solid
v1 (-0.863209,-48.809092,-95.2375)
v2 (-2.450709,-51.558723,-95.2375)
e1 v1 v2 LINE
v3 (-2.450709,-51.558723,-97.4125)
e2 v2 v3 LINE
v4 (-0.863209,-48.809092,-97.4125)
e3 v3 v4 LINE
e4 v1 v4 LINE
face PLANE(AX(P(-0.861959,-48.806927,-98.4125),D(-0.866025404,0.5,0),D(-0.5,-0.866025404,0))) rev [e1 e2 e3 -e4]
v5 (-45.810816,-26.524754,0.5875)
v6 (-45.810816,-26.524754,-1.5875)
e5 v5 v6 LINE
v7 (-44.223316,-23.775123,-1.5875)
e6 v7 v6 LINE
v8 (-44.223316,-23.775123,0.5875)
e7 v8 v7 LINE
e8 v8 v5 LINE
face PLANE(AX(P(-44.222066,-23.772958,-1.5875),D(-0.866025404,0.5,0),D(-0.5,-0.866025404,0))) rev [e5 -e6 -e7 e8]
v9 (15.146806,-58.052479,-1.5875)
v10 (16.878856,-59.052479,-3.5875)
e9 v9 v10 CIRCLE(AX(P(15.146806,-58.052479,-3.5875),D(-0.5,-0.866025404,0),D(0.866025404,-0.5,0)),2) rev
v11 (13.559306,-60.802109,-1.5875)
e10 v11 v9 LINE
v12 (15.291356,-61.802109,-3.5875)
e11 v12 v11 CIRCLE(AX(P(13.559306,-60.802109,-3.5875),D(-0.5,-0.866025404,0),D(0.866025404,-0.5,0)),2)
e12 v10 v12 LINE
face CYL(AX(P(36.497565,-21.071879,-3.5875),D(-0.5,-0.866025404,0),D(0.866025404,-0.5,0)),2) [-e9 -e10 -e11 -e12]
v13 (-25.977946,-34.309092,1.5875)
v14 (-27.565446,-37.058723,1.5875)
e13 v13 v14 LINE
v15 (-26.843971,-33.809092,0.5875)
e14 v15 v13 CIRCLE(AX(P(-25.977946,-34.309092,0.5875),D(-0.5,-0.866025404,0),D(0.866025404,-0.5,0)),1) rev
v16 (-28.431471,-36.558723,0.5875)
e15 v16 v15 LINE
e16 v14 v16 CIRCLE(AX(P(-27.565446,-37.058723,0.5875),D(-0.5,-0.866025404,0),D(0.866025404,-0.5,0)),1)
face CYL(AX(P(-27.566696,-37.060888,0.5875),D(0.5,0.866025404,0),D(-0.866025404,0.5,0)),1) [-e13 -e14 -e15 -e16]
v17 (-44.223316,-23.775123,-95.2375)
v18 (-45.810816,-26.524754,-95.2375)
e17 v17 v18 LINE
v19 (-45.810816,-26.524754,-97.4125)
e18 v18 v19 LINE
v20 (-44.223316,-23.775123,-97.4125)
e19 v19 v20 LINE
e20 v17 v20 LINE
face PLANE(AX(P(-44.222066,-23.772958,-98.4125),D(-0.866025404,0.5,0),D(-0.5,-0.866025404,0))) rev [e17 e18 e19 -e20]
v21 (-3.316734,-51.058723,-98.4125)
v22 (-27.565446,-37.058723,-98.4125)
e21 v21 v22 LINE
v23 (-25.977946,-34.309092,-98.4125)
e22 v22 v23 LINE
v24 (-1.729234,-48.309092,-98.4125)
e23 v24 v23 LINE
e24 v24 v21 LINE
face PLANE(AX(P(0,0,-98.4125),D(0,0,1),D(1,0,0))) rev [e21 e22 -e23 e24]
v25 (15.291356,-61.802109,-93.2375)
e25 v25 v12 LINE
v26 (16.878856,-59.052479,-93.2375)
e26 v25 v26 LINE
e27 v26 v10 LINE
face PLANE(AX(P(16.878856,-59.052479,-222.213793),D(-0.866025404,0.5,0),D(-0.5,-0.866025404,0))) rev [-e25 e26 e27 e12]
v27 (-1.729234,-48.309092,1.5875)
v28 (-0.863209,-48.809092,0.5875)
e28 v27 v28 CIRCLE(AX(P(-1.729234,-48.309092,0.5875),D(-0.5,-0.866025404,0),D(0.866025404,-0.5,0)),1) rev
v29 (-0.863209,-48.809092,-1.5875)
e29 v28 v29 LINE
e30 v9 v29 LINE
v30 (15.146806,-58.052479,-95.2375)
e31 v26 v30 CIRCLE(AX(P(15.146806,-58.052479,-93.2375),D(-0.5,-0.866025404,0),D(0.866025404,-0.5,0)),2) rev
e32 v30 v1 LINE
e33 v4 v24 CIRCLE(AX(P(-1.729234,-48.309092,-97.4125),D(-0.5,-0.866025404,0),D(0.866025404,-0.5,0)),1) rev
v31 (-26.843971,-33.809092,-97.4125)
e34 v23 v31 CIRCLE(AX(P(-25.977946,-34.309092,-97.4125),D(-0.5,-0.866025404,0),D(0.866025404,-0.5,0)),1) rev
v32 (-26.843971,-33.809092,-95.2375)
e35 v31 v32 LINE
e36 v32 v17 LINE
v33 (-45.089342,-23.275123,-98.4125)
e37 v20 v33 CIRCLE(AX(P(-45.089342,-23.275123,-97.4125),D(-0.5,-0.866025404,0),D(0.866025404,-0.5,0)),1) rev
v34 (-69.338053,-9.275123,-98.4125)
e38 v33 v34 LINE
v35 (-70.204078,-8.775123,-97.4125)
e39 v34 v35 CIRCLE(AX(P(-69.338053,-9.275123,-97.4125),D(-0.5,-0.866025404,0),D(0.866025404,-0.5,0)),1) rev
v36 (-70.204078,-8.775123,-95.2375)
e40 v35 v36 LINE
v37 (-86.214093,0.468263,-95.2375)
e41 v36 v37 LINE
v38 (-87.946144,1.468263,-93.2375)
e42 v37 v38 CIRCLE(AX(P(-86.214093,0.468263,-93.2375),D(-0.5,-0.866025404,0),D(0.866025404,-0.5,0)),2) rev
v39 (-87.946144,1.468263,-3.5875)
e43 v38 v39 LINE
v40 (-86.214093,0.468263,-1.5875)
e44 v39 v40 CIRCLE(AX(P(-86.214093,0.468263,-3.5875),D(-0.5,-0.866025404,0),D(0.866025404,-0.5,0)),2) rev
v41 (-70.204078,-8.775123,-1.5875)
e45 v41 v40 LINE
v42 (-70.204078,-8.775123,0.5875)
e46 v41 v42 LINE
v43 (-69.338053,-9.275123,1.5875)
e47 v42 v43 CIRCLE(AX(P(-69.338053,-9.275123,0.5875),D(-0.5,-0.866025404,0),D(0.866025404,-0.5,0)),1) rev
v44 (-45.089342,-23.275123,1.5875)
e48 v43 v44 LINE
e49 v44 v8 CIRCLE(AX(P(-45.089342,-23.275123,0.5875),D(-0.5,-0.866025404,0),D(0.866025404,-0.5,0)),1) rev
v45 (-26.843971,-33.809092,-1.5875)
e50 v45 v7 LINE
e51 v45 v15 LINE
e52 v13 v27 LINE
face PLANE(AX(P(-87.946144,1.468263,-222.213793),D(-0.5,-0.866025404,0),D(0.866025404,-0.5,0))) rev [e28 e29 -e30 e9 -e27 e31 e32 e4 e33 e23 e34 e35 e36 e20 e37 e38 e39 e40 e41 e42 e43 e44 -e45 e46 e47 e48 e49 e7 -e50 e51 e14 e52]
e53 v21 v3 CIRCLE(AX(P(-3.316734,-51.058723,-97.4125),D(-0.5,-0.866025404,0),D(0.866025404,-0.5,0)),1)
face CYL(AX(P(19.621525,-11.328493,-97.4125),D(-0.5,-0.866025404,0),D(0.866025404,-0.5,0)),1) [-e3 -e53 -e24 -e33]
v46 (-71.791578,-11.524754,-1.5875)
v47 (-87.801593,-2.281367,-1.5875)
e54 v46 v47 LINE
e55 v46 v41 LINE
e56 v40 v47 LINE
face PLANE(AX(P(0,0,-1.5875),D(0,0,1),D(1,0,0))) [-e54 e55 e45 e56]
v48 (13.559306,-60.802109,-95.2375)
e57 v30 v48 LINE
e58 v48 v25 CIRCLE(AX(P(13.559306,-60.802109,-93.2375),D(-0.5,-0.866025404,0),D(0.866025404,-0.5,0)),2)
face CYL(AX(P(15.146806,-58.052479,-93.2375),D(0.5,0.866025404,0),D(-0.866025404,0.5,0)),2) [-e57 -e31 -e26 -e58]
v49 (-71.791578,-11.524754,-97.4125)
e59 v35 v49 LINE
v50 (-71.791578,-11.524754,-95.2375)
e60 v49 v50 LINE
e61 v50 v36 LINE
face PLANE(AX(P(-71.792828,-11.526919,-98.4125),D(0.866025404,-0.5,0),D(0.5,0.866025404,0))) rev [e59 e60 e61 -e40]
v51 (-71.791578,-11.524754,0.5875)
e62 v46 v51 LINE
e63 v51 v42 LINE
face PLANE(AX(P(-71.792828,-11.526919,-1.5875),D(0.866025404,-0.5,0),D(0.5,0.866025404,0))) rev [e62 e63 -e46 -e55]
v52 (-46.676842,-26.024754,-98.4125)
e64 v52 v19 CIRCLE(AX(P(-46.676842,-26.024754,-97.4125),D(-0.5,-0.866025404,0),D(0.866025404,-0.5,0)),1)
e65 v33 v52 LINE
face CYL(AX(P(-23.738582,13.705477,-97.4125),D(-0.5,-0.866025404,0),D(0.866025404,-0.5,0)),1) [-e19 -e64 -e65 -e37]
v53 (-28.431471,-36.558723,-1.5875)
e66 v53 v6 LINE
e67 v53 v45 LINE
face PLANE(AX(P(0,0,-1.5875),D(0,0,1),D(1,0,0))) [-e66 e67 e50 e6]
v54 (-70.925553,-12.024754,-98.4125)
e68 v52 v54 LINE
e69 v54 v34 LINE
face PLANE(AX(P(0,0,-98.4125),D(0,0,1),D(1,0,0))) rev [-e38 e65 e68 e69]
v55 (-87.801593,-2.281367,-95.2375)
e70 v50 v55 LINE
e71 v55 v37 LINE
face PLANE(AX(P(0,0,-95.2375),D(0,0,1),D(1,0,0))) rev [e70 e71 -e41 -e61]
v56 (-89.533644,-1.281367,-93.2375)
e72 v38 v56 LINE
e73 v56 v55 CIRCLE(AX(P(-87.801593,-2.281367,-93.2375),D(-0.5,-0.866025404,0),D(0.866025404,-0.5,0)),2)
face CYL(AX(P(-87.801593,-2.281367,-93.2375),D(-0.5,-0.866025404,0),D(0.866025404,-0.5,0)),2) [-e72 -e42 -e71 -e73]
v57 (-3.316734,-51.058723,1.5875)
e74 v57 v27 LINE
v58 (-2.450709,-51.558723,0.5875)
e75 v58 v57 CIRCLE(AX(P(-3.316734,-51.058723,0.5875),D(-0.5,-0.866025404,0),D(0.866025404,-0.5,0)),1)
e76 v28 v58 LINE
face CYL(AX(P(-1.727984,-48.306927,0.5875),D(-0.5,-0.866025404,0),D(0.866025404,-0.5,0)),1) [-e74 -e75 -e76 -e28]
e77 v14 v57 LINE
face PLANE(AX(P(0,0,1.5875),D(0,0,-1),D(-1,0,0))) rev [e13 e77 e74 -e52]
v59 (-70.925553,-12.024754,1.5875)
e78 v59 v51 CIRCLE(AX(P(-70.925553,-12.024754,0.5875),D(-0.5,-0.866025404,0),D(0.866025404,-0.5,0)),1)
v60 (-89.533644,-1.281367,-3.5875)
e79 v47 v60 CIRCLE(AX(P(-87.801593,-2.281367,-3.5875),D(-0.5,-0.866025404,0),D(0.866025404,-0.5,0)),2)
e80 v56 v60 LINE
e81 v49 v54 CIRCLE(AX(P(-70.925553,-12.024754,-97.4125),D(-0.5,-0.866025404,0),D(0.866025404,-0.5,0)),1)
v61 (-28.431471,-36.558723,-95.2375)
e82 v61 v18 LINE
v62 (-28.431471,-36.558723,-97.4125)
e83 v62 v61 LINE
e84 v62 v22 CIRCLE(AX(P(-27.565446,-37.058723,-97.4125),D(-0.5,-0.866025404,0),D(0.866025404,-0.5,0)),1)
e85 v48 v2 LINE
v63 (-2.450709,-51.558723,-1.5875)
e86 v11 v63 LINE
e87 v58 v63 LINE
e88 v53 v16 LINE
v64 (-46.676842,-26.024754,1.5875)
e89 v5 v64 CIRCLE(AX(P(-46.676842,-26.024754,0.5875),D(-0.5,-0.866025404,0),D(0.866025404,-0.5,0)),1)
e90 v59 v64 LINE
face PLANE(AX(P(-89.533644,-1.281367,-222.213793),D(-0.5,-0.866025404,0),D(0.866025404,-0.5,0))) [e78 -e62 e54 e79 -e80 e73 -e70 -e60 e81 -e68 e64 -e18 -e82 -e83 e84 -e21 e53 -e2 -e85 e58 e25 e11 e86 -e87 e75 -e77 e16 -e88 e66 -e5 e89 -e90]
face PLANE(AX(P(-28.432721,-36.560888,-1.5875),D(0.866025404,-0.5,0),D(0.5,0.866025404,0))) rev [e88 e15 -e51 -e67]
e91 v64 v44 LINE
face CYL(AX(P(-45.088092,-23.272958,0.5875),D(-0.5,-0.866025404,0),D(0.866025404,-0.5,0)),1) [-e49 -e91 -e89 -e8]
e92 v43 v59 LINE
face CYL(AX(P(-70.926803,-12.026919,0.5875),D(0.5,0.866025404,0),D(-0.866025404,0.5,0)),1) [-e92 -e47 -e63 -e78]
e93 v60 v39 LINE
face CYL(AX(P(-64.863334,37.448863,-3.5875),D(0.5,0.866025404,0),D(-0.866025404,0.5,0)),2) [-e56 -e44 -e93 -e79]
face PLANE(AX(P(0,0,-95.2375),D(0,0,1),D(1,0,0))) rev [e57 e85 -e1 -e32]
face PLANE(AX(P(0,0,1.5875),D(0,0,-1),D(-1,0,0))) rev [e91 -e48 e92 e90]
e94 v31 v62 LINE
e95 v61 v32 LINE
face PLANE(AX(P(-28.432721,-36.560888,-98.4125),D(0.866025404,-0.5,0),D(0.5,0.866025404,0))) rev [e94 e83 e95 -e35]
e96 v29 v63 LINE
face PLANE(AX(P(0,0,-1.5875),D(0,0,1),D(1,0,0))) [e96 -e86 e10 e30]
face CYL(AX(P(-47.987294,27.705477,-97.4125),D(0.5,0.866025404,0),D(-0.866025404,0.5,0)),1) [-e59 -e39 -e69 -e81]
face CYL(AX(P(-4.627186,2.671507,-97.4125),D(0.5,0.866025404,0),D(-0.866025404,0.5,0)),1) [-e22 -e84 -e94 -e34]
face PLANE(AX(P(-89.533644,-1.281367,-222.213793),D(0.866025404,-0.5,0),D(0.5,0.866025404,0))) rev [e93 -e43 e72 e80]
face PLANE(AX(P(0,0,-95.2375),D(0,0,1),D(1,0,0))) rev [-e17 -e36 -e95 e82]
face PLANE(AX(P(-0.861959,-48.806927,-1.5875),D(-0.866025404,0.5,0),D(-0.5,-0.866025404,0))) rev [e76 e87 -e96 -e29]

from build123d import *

# Parameters (mm, degrees)
EXTRUDE_THIN1_DEPTH = 100
CAVITY1_START       = -76.897726178
CAVITY1_OUTLINE_W   = 3.175
CAVITY1_OUTLINE_H   = 3.175
CAVITY1_DEPTH       = 20.486772374
CAVITY1_START_2     = 23.656985384
CAVITY1_2_OUTLINE_W = 3.175
CAVITY1_2_OUTLINE_H = 3.175
CAVITY1_2_DEPTH     = 20.486772374
CAVITY1_START_3     = -26.410953804
CAVITY1_3_OUTLINE_W = 3.175
CAVITY1_3_OUTLINE_H = 3.175
CAVITY1_3_DEPTH     = 20.067939188
FILLET1_R           = 2
FILLET2_R           = 1


# Read off the part's stored shape, not the designer's step: Cavity1
with BuildPart() as part:
    # Sketch1 → Extrude-Thin1 (new body)
    with BuildSketch(Plane.XY.offset(1.5875)):
        Polygon((-89.533643617, -1.281367376), (15.291356383, -61.802109344), (16.878856383, -59.052478687), (-87.946143617, 1.468263281), align=None)
    extrude(amount=-EXTRUDE_THIN1_DEPTH)

    # Cavity1 outline → Cavity1 (cut)
    with BuildSketch(Plane(origin=(0, 0, 0), x_dir=(0.5000000000000022, 0.8660254037844374, 0), z_dir=(0.8660254037844374, -0.5000000000000022, 0)).offset(CAVITY1_START)):
        with Locations((-44.289018508, -96.825)):
            Rectangle(CAVITY1_OUTLINE_W, CAVITY1_OUTLINE_H)
        with Locations((-44.289018508, 0)):
            Rectangle(CAVITY1_OUTLINE_W, CAVITY1_OUTLINE_H)
    extrude(amount=CAVITY1_DEPTH, mode=Mode.SUBTRACT)

    # Cavity1 2 outline → Cavity1 2 (cut)
    with BuildSketch(Plane(origin=(0, 0, 0), x_dir=(0.5000000000000022, 0.8660254037844374, 0), z_dir=(0.8660254037844374, -0.5000000000000022, 0)).offset(CAVITY1_START_2)):
        with Locations((-44.289018508, -96.825)):
            Rectangle(CAVITY1_2_OUTLINE_W, CAVITY1_2_OUTLINE_H)
        with Locations((-44.289018508, 0)):
            Rectangle(CAVITY1_2_OUTLINE_W, CAVITY1_2_OUTLINE_H)
    extrude(amount=CAVITY1_2_DEPTH, mode=Mode.SUBTRACT)

    # Cavity1 3 outline → Cavity1 3 (cut)
    with BuildSketch(Plane(origin=(0, 0, 0), x_dir=(0.5000000000000022, 0.8660254037844374, 0), z_dir=(0.8660254037844374, -0.5000000000000022, 0)).offset(CAVITY1_START_3)):
        with Locations((-44.289018508, -96.825)):
            Rectangle(CAVITY1_3_OUTLINE_W, CAVITY1_3_OUTLINE_H)
        with Locations((-44.289018508, 0)):
            Rectangle(CAVITY1_3_OUTLINE_W, CAVITY1_3_OUTLINE_H)
    extrude(amount=CAVITY1_3_DEPTH, mode=Mode.SUBTRACT)

    # Fillet1
    fillet1_edges = [part.edges().sort_by_distance(p)[0] for p in [
        (-88.739893617, 0.093447952, -1.5875),
        (16.085106383, -60.427294016, -1.5875),
        (16.085106383, -60.427294016, -95.2375),
        (-88.739893617, 0.093447952, -95.2375),
    ]]
    fillet(fillet1_edges, radius=FILLET1_R)

    # Fillet2
    fillet2_edges = [part.edges().sort_by_distance(p)[0] for p in [
        (-27.637721048, -35.183907829, -98.4125),
        (-1.656958934, -50.183907829, -98.4125),
        (-45.017066186, -25.149938235, -98.4125),
        (-70.9978283, -10.149938235, -98.4125),
        (-27.637721048, -35.183907829, 1.5875),
        (-45.017066186, -25.149938235, 1.5875),
        (-1.656958934, -50.183907829, 1.5875),
        (-70.9978283, -10.149938235, 1.5875),
    ]]
    fillet(fillet2_edges, radius=FILLET2_R)


solid = part.part
